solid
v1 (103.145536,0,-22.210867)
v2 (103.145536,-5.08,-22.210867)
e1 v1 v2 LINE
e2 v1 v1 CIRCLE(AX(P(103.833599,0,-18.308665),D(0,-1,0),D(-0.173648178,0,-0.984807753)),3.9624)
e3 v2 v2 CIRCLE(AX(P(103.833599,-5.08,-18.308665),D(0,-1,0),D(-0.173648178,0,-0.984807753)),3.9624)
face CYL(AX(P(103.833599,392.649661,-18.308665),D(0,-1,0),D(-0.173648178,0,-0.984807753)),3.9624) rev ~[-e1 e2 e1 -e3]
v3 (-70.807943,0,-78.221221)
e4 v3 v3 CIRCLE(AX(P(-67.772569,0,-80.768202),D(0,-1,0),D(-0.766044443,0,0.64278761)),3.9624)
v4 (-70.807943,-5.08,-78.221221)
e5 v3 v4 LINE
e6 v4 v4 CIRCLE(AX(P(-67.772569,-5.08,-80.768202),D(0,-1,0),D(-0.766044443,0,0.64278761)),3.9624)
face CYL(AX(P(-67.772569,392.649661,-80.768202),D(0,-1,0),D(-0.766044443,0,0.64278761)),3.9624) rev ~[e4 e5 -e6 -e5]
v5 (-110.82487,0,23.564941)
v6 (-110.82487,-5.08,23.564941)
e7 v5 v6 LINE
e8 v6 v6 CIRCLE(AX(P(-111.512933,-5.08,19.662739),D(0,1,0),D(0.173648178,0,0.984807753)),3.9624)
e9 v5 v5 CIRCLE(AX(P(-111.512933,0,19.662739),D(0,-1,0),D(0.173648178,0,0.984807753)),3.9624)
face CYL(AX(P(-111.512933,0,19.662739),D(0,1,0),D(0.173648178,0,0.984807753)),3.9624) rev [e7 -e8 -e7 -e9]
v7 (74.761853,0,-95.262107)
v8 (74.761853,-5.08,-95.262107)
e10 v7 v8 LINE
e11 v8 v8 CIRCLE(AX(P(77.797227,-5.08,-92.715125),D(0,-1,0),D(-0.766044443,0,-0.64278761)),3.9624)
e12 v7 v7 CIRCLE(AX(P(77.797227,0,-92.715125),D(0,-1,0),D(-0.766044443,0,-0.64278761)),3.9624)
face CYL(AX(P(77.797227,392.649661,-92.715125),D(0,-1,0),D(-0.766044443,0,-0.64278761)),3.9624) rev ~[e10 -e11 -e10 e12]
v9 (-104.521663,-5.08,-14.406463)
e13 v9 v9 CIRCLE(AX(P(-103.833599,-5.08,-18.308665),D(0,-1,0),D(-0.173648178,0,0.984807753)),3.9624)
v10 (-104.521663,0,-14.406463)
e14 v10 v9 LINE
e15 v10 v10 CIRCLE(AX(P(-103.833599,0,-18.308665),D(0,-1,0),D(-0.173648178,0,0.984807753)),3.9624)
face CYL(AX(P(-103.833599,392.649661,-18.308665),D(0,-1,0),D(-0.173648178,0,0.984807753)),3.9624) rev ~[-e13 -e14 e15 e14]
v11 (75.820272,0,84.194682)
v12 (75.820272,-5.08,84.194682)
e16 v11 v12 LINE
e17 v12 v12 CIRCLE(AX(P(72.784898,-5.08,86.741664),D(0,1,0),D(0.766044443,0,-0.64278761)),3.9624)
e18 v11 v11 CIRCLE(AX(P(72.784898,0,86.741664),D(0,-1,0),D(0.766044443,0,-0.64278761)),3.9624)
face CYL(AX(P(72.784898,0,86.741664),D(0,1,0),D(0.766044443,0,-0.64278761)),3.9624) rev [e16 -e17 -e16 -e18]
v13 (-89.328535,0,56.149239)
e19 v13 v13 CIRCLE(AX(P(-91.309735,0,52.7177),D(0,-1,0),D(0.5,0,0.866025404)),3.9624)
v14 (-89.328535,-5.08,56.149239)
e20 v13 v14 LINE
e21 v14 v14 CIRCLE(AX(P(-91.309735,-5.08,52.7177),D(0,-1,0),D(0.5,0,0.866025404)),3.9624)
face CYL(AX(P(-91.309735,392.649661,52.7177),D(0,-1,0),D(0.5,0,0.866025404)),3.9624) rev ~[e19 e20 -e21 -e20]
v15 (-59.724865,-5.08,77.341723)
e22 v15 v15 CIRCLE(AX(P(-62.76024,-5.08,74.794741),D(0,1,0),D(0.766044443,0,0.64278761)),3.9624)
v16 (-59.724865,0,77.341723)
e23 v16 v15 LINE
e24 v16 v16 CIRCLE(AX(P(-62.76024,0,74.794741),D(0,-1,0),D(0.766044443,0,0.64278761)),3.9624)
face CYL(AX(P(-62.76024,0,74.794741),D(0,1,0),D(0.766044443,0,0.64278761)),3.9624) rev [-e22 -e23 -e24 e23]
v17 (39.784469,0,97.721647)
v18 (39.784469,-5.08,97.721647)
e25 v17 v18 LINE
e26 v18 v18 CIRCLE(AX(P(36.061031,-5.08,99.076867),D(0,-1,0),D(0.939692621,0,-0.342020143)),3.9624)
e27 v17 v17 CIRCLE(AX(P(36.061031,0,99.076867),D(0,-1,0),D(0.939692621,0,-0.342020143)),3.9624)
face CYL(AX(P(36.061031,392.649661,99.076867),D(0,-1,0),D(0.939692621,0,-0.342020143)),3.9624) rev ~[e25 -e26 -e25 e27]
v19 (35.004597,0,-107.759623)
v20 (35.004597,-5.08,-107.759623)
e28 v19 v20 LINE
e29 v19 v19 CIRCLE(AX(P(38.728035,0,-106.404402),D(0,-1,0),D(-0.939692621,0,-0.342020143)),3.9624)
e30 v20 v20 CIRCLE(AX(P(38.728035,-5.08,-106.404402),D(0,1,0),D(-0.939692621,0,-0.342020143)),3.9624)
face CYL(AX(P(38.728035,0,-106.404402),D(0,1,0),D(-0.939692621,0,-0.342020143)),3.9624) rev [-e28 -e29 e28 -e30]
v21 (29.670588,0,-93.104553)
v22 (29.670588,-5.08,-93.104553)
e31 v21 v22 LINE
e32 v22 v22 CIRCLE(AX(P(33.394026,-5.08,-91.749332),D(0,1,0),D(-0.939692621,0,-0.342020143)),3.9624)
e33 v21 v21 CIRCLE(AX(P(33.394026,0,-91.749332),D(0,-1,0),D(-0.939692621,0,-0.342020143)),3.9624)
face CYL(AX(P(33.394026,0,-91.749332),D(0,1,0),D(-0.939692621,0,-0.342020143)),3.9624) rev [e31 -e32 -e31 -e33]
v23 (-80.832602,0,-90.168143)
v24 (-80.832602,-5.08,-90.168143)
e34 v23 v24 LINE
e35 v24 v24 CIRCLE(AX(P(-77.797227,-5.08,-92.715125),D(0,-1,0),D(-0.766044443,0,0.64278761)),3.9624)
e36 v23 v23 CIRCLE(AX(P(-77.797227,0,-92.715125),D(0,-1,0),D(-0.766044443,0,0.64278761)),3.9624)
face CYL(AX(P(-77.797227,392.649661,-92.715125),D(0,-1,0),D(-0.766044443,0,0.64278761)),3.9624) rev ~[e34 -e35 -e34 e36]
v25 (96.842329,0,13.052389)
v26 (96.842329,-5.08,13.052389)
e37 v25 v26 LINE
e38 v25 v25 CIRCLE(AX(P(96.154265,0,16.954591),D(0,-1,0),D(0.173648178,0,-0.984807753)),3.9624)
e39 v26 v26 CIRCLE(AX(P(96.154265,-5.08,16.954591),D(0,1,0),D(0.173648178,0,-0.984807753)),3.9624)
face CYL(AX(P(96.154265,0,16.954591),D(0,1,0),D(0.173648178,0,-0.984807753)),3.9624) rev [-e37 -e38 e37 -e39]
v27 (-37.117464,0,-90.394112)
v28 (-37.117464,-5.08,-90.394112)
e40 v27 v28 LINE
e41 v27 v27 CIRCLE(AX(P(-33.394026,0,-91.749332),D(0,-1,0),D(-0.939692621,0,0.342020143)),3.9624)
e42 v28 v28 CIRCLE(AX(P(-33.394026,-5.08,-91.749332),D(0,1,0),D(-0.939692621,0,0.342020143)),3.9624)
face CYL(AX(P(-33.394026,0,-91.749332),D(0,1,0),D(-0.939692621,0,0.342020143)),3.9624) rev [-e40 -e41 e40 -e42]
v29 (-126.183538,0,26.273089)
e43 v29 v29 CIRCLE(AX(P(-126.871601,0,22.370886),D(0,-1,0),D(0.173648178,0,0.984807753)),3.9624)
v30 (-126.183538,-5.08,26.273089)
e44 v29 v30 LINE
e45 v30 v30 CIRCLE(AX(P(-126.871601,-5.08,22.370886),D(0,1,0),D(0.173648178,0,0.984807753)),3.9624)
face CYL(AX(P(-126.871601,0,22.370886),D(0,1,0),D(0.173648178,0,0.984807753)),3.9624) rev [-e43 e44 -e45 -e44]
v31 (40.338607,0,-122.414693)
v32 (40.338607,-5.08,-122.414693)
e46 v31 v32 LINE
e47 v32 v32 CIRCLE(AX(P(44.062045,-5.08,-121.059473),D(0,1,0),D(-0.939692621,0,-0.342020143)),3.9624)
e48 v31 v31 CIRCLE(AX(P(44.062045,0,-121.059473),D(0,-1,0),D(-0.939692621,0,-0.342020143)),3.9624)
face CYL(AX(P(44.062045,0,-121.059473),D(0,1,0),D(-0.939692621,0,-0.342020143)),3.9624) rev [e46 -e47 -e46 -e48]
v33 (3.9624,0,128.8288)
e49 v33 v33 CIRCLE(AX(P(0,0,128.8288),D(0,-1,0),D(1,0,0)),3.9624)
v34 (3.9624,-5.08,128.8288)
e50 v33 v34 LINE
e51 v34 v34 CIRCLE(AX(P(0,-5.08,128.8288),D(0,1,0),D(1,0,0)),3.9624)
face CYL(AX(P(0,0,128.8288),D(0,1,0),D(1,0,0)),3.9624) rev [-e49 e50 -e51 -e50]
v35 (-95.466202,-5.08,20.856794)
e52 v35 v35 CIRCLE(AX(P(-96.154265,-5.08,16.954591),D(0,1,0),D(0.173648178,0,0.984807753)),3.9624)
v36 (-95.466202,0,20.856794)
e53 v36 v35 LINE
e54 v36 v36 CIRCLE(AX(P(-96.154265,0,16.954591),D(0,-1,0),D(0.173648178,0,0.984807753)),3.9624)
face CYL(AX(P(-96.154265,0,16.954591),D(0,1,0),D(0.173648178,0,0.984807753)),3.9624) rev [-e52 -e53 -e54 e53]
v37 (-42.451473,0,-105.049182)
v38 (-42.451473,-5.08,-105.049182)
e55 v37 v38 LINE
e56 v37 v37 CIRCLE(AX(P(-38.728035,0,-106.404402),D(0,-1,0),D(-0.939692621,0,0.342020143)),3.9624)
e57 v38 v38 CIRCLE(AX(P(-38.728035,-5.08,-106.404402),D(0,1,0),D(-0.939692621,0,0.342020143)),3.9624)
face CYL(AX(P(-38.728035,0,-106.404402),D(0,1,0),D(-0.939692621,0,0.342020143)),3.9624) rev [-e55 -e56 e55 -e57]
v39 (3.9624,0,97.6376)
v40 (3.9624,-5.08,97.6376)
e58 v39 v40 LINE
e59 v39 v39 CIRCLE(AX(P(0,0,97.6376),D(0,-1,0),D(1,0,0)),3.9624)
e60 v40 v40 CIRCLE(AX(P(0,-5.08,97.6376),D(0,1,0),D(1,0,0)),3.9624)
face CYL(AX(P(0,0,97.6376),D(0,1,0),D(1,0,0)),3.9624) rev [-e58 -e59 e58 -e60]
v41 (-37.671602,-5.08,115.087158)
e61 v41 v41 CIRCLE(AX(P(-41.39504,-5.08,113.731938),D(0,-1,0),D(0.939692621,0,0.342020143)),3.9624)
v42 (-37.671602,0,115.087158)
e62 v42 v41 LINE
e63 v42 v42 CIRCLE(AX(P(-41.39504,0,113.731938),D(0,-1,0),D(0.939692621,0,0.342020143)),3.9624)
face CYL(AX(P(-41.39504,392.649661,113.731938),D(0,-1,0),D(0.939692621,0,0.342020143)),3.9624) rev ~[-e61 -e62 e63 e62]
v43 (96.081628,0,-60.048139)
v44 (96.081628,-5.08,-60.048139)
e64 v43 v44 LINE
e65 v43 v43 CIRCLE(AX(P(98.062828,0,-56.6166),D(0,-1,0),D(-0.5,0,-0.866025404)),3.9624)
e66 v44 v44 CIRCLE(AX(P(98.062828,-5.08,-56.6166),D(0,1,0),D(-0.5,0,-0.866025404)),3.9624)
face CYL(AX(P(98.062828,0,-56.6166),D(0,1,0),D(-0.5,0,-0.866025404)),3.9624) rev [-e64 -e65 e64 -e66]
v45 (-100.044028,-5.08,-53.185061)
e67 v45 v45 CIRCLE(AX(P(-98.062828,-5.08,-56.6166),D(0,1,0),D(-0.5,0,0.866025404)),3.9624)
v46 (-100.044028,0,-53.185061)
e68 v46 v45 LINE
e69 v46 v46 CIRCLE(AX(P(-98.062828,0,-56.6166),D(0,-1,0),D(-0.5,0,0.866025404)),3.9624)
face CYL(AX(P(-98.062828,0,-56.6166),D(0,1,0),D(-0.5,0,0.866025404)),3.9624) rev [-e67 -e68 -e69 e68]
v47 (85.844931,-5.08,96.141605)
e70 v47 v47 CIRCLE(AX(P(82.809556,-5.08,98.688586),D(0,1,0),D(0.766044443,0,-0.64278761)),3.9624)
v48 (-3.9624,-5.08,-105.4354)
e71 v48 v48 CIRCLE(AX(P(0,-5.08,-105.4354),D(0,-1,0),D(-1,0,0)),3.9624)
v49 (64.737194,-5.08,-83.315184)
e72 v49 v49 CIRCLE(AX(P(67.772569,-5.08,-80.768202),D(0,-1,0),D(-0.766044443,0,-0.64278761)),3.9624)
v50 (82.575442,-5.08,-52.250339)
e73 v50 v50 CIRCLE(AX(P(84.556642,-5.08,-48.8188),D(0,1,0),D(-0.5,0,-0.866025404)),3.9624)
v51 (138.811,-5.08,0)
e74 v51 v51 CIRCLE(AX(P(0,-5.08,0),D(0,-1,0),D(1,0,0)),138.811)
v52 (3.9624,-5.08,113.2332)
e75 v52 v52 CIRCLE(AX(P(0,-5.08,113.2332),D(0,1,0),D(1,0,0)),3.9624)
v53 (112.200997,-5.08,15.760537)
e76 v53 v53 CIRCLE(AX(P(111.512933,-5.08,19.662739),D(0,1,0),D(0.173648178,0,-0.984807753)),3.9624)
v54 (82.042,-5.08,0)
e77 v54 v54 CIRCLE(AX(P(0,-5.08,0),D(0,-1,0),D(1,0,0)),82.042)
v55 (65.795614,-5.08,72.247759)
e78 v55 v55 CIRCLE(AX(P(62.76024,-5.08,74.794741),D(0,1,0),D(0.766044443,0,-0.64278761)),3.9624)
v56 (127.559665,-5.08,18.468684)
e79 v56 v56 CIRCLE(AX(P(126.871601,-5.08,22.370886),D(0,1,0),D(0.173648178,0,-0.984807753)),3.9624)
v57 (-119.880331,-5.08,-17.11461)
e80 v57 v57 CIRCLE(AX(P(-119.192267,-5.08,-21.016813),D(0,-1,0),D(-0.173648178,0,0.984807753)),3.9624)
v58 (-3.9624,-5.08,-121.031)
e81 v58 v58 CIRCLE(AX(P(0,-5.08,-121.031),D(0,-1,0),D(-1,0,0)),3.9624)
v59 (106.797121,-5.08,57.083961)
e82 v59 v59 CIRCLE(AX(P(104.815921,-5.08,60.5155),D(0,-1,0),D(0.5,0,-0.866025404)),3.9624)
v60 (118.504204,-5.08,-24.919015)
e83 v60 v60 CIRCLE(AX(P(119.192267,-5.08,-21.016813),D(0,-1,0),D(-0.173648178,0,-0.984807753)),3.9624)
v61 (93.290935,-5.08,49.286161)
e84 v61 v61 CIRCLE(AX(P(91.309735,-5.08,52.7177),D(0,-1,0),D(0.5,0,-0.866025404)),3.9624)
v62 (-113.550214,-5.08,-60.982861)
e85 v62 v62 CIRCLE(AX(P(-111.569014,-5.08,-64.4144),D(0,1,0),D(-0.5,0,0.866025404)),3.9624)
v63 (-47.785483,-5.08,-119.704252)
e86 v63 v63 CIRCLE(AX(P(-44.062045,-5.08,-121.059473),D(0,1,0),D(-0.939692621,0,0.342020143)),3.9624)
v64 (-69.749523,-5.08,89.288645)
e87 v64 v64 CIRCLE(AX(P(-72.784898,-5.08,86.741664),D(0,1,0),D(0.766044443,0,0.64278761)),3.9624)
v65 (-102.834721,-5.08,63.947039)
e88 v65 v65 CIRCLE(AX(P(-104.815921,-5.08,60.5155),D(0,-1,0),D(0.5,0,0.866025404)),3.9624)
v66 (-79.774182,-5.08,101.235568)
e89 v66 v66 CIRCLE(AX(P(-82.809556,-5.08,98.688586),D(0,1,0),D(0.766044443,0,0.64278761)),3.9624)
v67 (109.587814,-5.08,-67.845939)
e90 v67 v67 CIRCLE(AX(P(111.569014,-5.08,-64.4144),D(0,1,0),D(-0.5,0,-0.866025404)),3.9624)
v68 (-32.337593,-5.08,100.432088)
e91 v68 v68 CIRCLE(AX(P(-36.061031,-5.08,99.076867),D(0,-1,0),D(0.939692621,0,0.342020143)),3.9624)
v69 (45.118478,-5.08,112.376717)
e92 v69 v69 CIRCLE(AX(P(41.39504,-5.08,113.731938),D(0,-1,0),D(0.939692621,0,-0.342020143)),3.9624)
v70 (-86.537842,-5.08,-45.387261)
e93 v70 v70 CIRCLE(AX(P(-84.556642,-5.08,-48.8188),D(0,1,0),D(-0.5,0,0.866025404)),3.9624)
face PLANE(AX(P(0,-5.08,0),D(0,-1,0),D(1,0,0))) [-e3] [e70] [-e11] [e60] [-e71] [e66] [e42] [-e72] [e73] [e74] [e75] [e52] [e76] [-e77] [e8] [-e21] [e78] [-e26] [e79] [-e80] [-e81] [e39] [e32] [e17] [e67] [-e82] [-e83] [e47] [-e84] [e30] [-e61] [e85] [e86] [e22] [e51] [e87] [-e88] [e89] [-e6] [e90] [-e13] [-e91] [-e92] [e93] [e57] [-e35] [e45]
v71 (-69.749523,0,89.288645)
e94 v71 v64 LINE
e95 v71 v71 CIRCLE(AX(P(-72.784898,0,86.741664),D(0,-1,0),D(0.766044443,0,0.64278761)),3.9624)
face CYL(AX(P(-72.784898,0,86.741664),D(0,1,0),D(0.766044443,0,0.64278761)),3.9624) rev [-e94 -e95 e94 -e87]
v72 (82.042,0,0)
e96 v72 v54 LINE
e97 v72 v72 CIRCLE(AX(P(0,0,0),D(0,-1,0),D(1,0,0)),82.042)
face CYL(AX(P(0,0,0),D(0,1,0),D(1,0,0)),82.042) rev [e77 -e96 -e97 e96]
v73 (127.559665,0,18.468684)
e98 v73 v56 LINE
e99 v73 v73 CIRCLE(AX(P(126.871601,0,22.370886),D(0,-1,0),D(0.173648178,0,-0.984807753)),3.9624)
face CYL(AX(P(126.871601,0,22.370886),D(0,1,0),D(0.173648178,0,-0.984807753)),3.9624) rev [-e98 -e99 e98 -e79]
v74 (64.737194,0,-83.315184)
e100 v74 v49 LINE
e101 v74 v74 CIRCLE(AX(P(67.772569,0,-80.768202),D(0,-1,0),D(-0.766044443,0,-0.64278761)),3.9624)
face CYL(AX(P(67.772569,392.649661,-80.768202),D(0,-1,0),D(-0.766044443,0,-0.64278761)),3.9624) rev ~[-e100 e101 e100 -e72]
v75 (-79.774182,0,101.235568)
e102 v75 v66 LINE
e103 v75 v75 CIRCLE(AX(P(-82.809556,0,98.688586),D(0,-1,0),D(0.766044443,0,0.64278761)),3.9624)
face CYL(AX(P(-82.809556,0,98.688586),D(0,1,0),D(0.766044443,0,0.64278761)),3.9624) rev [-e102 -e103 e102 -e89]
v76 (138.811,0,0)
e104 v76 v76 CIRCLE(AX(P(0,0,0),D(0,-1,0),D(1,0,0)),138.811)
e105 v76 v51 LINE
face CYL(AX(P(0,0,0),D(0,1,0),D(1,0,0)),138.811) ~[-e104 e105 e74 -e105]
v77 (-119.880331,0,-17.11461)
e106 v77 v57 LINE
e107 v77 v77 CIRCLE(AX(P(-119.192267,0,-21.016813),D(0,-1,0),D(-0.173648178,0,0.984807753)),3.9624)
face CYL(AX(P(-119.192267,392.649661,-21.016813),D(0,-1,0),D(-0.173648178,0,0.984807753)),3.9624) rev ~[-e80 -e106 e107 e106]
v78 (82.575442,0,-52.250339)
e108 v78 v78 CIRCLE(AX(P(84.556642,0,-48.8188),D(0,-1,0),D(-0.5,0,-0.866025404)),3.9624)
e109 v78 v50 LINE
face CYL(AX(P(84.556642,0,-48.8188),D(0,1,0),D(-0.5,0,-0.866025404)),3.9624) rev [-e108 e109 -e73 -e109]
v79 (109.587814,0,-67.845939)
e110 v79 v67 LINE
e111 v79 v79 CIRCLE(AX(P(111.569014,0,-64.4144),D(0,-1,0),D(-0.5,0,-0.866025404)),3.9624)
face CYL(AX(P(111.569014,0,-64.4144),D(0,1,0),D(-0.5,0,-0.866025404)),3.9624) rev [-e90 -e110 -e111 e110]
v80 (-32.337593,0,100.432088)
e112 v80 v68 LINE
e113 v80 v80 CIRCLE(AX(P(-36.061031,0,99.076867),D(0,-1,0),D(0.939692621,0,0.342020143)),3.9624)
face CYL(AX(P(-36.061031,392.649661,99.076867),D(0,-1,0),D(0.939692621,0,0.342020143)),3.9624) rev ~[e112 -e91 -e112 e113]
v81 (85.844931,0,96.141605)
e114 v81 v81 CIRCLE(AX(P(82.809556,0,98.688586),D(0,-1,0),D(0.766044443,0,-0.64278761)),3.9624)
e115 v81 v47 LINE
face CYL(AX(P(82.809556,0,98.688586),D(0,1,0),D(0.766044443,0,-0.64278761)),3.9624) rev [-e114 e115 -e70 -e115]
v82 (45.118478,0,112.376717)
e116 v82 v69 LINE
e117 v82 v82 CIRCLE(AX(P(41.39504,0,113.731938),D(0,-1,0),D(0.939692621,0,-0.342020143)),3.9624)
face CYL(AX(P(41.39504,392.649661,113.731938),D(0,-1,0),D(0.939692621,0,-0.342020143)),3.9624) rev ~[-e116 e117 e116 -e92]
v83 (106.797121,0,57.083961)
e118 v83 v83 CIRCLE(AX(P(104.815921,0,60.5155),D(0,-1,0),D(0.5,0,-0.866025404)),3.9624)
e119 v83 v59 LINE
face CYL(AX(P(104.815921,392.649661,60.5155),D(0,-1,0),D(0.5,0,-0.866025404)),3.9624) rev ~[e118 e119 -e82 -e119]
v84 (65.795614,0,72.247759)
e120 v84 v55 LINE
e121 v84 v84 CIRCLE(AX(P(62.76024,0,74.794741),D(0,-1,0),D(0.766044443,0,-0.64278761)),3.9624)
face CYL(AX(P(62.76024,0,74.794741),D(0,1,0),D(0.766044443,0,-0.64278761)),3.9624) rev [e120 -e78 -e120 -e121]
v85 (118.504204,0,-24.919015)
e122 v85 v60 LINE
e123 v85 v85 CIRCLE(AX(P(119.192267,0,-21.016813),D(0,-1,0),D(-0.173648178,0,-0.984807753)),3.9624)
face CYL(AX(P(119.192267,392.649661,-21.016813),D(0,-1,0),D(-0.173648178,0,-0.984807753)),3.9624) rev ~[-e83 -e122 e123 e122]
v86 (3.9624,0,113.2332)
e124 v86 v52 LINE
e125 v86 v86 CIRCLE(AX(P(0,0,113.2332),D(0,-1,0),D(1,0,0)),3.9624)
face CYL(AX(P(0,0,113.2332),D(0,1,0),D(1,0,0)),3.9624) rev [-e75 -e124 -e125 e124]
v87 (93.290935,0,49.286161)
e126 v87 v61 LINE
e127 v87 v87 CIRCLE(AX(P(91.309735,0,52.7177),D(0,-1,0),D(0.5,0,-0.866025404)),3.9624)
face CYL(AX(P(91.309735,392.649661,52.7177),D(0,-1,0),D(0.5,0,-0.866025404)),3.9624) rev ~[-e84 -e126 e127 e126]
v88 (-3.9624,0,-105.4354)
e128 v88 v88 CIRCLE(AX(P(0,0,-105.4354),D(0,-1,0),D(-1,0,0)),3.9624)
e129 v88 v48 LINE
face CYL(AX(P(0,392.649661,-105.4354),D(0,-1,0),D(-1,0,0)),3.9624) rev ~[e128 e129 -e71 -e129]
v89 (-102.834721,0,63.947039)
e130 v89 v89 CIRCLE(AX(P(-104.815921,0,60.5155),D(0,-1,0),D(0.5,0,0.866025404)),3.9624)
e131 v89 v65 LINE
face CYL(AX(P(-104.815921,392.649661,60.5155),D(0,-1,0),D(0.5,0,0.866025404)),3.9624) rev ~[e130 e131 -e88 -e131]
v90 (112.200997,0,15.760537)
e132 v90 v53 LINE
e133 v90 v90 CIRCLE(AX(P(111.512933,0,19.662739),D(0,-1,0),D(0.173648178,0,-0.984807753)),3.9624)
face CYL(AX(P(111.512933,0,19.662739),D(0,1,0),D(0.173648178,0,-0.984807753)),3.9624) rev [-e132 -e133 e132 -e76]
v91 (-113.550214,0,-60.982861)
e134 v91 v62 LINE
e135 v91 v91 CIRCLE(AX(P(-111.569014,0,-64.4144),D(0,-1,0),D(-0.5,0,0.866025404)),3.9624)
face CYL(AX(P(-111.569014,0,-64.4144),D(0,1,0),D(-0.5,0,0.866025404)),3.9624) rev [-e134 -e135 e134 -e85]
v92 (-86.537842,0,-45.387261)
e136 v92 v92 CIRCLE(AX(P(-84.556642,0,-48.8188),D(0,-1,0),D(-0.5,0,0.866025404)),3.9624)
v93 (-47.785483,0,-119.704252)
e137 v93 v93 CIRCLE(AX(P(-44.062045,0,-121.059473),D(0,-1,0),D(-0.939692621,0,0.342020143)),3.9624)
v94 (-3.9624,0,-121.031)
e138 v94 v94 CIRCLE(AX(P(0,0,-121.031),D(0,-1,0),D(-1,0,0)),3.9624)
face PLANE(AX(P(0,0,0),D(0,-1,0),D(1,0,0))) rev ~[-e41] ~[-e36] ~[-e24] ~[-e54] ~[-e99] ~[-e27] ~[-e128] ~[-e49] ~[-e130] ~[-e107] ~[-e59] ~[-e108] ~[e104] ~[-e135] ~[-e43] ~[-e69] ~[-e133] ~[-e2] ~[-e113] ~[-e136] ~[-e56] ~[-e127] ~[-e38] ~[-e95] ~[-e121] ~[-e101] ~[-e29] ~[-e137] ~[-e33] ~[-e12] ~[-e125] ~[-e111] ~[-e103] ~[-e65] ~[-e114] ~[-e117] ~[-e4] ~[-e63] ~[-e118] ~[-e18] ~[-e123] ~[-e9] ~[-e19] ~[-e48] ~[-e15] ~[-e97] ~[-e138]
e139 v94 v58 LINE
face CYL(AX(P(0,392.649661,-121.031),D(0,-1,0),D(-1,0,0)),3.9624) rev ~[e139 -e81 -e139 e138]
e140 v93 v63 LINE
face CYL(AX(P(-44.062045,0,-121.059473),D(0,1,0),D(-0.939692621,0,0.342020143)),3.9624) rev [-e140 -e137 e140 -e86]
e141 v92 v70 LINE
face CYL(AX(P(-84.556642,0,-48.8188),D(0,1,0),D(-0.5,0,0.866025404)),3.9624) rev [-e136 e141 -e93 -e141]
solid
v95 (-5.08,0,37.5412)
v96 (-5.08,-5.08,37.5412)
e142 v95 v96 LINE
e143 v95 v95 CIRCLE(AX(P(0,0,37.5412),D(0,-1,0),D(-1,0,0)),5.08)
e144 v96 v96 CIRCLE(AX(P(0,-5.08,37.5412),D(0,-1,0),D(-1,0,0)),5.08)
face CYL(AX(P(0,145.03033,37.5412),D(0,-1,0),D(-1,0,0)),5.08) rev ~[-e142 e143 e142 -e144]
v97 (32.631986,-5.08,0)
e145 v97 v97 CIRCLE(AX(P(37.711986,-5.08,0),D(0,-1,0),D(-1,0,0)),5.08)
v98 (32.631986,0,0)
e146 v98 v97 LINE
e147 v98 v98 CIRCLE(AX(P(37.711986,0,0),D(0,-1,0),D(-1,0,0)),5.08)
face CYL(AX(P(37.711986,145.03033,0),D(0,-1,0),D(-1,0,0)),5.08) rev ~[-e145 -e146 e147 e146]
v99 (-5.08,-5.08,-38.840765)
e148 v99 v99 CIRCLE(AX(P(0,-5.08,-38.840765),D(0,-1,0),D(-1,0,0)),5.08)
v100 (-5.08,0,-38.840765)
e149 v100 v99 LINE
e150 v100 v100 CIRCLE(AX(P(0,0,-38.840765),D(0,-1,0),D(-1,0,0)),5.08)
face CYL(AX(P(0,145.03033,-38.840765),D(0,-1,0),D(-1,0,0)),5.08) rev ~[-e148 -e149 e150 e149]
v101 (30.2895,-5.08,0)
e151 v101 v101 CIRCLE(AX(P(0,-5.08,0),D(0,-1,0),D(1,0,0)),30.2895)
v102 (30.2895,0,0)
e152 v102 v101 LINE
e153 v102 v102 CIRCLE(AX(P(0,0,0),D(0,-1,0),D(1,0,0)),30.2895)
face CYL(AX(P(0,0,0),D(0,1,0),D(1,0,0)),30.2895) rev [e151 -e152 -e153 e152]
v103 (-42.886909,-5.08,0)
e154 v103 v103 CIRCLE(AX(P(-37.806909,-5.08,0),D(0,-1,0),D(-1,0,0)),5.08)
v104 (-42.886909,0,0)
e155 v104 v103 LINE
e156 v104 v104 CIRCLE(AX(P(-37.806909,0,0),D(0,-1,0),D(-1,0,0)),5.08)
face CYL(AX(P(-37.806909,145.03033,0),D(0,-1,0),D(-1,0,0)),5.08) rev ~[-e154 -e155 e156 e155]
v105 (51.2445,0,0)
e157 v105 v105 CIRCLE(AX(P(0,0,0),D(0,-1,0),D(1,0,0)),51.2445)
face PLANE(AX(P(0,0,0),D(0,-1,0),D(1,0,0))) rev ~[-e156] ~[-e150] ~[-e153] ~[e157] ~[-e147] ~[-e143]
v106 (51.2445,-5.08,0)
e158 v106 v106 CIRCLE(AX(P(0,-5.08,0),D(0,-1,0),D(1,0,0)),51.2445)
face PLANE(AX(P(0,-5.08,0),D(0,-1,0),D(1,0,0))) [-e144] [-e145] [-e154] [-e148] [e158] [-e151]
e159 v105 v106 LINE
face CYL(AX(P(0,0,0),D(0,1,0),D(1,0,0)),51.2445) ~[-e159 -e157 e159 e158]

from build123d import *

# Parameters (mm, degrees)
F0_R            = 138.811
F0_R_2          = 82.042
F3_DEPTH        = 5.08
F2_R            = 3.9624
F4_DEPTH        = 5.081
F4_COPIES_COUNT = 9
F6_D            = 7.9248
F6_COPIES_COUNT = 9
F0_R_3          = 51.2445
F0_R_4          = 30.2895
F7_DEPTH        = 5.08
F8_D            = 10.16


# Not quite as in the source:
# - a pattern or mirror of a feature is missing from the dataset's text; its kind, count and spacing are read off the source's solid


with BuildPart() as f3:
    # F0 (on Front) → F3 (new body)
    with BuildSketch(Plane.XZ):
        Circle(F0_R)
        Circle(F0_R_2, mode=Mode.SUBTRACT)
    extrude(amount=F3_DEPTH)

    # F2 (on face) → F4 (cut, through all)
    with BuildSketch(Plane.XZ):
        with Locations((0, 97.6376)):
            Circle(F2_R)
        with Locations((0, 113.2332)):
            Circle(F2_R)
        with Locations((0, 128.8288)):
            Circle(F2_R)
    f4 = extrude(amount=F4_DEPTH, mode=Mode.SUBTRACT)

    # F4_copies: F4 ×9 about axis
    f4_copies_axis = Axis((0, 0, 0), (0, 1, 0))
    for i in range(1, F4_COPIES_COUNT):
        add(f4.rotate(f4_copies_axis, i * 360 / F4_COPIES_COUNT), mode=Mode.SUBTRACT)

    # F6 (through all)
    with Locations(Plane(origin=(0, 0, 0), x_dir=(1, 0, 0), z_dir=(0, 1, 0))):
        with Locations((0, 105.4354), (0, 121.031)):
            f6 = Hole(F6_D / 2)

    # F6_copies: F6 ×9 about axis
    f6_copies_axis = Axis((0, 0, 0), (0, 1, 0))
    for i in range(1, F6_COPIES_COUNT):
        add(f6.rotate(f6_copies_axis, i * 360 / F6_COPIES_COUNT), mode=Mode.SUBTRACT)


with BuildPart() as f7:
    # F0 (on Front) → F7 (new body)
    with BuildSketch(Plane.XZ):
        Circle(F0_R_3)
        Circle(F0_R_4, mode=Mode.SUBTRACT)
    extrude(amount=F7_DEPTH)

    # F8 (through all)
    with Locations(Plane(origin=(0, 0, 0), x_dir=(1, 0, 0), z_dir=(0, 1, 0))):
        with Locations((0, -37.5412), (37.7119863628, 0), (0, 38.8407654956), (-37.8069085799, 0)):
            Hole(F8_D / 2)


solid = Compound([f3.part, f7.part])
